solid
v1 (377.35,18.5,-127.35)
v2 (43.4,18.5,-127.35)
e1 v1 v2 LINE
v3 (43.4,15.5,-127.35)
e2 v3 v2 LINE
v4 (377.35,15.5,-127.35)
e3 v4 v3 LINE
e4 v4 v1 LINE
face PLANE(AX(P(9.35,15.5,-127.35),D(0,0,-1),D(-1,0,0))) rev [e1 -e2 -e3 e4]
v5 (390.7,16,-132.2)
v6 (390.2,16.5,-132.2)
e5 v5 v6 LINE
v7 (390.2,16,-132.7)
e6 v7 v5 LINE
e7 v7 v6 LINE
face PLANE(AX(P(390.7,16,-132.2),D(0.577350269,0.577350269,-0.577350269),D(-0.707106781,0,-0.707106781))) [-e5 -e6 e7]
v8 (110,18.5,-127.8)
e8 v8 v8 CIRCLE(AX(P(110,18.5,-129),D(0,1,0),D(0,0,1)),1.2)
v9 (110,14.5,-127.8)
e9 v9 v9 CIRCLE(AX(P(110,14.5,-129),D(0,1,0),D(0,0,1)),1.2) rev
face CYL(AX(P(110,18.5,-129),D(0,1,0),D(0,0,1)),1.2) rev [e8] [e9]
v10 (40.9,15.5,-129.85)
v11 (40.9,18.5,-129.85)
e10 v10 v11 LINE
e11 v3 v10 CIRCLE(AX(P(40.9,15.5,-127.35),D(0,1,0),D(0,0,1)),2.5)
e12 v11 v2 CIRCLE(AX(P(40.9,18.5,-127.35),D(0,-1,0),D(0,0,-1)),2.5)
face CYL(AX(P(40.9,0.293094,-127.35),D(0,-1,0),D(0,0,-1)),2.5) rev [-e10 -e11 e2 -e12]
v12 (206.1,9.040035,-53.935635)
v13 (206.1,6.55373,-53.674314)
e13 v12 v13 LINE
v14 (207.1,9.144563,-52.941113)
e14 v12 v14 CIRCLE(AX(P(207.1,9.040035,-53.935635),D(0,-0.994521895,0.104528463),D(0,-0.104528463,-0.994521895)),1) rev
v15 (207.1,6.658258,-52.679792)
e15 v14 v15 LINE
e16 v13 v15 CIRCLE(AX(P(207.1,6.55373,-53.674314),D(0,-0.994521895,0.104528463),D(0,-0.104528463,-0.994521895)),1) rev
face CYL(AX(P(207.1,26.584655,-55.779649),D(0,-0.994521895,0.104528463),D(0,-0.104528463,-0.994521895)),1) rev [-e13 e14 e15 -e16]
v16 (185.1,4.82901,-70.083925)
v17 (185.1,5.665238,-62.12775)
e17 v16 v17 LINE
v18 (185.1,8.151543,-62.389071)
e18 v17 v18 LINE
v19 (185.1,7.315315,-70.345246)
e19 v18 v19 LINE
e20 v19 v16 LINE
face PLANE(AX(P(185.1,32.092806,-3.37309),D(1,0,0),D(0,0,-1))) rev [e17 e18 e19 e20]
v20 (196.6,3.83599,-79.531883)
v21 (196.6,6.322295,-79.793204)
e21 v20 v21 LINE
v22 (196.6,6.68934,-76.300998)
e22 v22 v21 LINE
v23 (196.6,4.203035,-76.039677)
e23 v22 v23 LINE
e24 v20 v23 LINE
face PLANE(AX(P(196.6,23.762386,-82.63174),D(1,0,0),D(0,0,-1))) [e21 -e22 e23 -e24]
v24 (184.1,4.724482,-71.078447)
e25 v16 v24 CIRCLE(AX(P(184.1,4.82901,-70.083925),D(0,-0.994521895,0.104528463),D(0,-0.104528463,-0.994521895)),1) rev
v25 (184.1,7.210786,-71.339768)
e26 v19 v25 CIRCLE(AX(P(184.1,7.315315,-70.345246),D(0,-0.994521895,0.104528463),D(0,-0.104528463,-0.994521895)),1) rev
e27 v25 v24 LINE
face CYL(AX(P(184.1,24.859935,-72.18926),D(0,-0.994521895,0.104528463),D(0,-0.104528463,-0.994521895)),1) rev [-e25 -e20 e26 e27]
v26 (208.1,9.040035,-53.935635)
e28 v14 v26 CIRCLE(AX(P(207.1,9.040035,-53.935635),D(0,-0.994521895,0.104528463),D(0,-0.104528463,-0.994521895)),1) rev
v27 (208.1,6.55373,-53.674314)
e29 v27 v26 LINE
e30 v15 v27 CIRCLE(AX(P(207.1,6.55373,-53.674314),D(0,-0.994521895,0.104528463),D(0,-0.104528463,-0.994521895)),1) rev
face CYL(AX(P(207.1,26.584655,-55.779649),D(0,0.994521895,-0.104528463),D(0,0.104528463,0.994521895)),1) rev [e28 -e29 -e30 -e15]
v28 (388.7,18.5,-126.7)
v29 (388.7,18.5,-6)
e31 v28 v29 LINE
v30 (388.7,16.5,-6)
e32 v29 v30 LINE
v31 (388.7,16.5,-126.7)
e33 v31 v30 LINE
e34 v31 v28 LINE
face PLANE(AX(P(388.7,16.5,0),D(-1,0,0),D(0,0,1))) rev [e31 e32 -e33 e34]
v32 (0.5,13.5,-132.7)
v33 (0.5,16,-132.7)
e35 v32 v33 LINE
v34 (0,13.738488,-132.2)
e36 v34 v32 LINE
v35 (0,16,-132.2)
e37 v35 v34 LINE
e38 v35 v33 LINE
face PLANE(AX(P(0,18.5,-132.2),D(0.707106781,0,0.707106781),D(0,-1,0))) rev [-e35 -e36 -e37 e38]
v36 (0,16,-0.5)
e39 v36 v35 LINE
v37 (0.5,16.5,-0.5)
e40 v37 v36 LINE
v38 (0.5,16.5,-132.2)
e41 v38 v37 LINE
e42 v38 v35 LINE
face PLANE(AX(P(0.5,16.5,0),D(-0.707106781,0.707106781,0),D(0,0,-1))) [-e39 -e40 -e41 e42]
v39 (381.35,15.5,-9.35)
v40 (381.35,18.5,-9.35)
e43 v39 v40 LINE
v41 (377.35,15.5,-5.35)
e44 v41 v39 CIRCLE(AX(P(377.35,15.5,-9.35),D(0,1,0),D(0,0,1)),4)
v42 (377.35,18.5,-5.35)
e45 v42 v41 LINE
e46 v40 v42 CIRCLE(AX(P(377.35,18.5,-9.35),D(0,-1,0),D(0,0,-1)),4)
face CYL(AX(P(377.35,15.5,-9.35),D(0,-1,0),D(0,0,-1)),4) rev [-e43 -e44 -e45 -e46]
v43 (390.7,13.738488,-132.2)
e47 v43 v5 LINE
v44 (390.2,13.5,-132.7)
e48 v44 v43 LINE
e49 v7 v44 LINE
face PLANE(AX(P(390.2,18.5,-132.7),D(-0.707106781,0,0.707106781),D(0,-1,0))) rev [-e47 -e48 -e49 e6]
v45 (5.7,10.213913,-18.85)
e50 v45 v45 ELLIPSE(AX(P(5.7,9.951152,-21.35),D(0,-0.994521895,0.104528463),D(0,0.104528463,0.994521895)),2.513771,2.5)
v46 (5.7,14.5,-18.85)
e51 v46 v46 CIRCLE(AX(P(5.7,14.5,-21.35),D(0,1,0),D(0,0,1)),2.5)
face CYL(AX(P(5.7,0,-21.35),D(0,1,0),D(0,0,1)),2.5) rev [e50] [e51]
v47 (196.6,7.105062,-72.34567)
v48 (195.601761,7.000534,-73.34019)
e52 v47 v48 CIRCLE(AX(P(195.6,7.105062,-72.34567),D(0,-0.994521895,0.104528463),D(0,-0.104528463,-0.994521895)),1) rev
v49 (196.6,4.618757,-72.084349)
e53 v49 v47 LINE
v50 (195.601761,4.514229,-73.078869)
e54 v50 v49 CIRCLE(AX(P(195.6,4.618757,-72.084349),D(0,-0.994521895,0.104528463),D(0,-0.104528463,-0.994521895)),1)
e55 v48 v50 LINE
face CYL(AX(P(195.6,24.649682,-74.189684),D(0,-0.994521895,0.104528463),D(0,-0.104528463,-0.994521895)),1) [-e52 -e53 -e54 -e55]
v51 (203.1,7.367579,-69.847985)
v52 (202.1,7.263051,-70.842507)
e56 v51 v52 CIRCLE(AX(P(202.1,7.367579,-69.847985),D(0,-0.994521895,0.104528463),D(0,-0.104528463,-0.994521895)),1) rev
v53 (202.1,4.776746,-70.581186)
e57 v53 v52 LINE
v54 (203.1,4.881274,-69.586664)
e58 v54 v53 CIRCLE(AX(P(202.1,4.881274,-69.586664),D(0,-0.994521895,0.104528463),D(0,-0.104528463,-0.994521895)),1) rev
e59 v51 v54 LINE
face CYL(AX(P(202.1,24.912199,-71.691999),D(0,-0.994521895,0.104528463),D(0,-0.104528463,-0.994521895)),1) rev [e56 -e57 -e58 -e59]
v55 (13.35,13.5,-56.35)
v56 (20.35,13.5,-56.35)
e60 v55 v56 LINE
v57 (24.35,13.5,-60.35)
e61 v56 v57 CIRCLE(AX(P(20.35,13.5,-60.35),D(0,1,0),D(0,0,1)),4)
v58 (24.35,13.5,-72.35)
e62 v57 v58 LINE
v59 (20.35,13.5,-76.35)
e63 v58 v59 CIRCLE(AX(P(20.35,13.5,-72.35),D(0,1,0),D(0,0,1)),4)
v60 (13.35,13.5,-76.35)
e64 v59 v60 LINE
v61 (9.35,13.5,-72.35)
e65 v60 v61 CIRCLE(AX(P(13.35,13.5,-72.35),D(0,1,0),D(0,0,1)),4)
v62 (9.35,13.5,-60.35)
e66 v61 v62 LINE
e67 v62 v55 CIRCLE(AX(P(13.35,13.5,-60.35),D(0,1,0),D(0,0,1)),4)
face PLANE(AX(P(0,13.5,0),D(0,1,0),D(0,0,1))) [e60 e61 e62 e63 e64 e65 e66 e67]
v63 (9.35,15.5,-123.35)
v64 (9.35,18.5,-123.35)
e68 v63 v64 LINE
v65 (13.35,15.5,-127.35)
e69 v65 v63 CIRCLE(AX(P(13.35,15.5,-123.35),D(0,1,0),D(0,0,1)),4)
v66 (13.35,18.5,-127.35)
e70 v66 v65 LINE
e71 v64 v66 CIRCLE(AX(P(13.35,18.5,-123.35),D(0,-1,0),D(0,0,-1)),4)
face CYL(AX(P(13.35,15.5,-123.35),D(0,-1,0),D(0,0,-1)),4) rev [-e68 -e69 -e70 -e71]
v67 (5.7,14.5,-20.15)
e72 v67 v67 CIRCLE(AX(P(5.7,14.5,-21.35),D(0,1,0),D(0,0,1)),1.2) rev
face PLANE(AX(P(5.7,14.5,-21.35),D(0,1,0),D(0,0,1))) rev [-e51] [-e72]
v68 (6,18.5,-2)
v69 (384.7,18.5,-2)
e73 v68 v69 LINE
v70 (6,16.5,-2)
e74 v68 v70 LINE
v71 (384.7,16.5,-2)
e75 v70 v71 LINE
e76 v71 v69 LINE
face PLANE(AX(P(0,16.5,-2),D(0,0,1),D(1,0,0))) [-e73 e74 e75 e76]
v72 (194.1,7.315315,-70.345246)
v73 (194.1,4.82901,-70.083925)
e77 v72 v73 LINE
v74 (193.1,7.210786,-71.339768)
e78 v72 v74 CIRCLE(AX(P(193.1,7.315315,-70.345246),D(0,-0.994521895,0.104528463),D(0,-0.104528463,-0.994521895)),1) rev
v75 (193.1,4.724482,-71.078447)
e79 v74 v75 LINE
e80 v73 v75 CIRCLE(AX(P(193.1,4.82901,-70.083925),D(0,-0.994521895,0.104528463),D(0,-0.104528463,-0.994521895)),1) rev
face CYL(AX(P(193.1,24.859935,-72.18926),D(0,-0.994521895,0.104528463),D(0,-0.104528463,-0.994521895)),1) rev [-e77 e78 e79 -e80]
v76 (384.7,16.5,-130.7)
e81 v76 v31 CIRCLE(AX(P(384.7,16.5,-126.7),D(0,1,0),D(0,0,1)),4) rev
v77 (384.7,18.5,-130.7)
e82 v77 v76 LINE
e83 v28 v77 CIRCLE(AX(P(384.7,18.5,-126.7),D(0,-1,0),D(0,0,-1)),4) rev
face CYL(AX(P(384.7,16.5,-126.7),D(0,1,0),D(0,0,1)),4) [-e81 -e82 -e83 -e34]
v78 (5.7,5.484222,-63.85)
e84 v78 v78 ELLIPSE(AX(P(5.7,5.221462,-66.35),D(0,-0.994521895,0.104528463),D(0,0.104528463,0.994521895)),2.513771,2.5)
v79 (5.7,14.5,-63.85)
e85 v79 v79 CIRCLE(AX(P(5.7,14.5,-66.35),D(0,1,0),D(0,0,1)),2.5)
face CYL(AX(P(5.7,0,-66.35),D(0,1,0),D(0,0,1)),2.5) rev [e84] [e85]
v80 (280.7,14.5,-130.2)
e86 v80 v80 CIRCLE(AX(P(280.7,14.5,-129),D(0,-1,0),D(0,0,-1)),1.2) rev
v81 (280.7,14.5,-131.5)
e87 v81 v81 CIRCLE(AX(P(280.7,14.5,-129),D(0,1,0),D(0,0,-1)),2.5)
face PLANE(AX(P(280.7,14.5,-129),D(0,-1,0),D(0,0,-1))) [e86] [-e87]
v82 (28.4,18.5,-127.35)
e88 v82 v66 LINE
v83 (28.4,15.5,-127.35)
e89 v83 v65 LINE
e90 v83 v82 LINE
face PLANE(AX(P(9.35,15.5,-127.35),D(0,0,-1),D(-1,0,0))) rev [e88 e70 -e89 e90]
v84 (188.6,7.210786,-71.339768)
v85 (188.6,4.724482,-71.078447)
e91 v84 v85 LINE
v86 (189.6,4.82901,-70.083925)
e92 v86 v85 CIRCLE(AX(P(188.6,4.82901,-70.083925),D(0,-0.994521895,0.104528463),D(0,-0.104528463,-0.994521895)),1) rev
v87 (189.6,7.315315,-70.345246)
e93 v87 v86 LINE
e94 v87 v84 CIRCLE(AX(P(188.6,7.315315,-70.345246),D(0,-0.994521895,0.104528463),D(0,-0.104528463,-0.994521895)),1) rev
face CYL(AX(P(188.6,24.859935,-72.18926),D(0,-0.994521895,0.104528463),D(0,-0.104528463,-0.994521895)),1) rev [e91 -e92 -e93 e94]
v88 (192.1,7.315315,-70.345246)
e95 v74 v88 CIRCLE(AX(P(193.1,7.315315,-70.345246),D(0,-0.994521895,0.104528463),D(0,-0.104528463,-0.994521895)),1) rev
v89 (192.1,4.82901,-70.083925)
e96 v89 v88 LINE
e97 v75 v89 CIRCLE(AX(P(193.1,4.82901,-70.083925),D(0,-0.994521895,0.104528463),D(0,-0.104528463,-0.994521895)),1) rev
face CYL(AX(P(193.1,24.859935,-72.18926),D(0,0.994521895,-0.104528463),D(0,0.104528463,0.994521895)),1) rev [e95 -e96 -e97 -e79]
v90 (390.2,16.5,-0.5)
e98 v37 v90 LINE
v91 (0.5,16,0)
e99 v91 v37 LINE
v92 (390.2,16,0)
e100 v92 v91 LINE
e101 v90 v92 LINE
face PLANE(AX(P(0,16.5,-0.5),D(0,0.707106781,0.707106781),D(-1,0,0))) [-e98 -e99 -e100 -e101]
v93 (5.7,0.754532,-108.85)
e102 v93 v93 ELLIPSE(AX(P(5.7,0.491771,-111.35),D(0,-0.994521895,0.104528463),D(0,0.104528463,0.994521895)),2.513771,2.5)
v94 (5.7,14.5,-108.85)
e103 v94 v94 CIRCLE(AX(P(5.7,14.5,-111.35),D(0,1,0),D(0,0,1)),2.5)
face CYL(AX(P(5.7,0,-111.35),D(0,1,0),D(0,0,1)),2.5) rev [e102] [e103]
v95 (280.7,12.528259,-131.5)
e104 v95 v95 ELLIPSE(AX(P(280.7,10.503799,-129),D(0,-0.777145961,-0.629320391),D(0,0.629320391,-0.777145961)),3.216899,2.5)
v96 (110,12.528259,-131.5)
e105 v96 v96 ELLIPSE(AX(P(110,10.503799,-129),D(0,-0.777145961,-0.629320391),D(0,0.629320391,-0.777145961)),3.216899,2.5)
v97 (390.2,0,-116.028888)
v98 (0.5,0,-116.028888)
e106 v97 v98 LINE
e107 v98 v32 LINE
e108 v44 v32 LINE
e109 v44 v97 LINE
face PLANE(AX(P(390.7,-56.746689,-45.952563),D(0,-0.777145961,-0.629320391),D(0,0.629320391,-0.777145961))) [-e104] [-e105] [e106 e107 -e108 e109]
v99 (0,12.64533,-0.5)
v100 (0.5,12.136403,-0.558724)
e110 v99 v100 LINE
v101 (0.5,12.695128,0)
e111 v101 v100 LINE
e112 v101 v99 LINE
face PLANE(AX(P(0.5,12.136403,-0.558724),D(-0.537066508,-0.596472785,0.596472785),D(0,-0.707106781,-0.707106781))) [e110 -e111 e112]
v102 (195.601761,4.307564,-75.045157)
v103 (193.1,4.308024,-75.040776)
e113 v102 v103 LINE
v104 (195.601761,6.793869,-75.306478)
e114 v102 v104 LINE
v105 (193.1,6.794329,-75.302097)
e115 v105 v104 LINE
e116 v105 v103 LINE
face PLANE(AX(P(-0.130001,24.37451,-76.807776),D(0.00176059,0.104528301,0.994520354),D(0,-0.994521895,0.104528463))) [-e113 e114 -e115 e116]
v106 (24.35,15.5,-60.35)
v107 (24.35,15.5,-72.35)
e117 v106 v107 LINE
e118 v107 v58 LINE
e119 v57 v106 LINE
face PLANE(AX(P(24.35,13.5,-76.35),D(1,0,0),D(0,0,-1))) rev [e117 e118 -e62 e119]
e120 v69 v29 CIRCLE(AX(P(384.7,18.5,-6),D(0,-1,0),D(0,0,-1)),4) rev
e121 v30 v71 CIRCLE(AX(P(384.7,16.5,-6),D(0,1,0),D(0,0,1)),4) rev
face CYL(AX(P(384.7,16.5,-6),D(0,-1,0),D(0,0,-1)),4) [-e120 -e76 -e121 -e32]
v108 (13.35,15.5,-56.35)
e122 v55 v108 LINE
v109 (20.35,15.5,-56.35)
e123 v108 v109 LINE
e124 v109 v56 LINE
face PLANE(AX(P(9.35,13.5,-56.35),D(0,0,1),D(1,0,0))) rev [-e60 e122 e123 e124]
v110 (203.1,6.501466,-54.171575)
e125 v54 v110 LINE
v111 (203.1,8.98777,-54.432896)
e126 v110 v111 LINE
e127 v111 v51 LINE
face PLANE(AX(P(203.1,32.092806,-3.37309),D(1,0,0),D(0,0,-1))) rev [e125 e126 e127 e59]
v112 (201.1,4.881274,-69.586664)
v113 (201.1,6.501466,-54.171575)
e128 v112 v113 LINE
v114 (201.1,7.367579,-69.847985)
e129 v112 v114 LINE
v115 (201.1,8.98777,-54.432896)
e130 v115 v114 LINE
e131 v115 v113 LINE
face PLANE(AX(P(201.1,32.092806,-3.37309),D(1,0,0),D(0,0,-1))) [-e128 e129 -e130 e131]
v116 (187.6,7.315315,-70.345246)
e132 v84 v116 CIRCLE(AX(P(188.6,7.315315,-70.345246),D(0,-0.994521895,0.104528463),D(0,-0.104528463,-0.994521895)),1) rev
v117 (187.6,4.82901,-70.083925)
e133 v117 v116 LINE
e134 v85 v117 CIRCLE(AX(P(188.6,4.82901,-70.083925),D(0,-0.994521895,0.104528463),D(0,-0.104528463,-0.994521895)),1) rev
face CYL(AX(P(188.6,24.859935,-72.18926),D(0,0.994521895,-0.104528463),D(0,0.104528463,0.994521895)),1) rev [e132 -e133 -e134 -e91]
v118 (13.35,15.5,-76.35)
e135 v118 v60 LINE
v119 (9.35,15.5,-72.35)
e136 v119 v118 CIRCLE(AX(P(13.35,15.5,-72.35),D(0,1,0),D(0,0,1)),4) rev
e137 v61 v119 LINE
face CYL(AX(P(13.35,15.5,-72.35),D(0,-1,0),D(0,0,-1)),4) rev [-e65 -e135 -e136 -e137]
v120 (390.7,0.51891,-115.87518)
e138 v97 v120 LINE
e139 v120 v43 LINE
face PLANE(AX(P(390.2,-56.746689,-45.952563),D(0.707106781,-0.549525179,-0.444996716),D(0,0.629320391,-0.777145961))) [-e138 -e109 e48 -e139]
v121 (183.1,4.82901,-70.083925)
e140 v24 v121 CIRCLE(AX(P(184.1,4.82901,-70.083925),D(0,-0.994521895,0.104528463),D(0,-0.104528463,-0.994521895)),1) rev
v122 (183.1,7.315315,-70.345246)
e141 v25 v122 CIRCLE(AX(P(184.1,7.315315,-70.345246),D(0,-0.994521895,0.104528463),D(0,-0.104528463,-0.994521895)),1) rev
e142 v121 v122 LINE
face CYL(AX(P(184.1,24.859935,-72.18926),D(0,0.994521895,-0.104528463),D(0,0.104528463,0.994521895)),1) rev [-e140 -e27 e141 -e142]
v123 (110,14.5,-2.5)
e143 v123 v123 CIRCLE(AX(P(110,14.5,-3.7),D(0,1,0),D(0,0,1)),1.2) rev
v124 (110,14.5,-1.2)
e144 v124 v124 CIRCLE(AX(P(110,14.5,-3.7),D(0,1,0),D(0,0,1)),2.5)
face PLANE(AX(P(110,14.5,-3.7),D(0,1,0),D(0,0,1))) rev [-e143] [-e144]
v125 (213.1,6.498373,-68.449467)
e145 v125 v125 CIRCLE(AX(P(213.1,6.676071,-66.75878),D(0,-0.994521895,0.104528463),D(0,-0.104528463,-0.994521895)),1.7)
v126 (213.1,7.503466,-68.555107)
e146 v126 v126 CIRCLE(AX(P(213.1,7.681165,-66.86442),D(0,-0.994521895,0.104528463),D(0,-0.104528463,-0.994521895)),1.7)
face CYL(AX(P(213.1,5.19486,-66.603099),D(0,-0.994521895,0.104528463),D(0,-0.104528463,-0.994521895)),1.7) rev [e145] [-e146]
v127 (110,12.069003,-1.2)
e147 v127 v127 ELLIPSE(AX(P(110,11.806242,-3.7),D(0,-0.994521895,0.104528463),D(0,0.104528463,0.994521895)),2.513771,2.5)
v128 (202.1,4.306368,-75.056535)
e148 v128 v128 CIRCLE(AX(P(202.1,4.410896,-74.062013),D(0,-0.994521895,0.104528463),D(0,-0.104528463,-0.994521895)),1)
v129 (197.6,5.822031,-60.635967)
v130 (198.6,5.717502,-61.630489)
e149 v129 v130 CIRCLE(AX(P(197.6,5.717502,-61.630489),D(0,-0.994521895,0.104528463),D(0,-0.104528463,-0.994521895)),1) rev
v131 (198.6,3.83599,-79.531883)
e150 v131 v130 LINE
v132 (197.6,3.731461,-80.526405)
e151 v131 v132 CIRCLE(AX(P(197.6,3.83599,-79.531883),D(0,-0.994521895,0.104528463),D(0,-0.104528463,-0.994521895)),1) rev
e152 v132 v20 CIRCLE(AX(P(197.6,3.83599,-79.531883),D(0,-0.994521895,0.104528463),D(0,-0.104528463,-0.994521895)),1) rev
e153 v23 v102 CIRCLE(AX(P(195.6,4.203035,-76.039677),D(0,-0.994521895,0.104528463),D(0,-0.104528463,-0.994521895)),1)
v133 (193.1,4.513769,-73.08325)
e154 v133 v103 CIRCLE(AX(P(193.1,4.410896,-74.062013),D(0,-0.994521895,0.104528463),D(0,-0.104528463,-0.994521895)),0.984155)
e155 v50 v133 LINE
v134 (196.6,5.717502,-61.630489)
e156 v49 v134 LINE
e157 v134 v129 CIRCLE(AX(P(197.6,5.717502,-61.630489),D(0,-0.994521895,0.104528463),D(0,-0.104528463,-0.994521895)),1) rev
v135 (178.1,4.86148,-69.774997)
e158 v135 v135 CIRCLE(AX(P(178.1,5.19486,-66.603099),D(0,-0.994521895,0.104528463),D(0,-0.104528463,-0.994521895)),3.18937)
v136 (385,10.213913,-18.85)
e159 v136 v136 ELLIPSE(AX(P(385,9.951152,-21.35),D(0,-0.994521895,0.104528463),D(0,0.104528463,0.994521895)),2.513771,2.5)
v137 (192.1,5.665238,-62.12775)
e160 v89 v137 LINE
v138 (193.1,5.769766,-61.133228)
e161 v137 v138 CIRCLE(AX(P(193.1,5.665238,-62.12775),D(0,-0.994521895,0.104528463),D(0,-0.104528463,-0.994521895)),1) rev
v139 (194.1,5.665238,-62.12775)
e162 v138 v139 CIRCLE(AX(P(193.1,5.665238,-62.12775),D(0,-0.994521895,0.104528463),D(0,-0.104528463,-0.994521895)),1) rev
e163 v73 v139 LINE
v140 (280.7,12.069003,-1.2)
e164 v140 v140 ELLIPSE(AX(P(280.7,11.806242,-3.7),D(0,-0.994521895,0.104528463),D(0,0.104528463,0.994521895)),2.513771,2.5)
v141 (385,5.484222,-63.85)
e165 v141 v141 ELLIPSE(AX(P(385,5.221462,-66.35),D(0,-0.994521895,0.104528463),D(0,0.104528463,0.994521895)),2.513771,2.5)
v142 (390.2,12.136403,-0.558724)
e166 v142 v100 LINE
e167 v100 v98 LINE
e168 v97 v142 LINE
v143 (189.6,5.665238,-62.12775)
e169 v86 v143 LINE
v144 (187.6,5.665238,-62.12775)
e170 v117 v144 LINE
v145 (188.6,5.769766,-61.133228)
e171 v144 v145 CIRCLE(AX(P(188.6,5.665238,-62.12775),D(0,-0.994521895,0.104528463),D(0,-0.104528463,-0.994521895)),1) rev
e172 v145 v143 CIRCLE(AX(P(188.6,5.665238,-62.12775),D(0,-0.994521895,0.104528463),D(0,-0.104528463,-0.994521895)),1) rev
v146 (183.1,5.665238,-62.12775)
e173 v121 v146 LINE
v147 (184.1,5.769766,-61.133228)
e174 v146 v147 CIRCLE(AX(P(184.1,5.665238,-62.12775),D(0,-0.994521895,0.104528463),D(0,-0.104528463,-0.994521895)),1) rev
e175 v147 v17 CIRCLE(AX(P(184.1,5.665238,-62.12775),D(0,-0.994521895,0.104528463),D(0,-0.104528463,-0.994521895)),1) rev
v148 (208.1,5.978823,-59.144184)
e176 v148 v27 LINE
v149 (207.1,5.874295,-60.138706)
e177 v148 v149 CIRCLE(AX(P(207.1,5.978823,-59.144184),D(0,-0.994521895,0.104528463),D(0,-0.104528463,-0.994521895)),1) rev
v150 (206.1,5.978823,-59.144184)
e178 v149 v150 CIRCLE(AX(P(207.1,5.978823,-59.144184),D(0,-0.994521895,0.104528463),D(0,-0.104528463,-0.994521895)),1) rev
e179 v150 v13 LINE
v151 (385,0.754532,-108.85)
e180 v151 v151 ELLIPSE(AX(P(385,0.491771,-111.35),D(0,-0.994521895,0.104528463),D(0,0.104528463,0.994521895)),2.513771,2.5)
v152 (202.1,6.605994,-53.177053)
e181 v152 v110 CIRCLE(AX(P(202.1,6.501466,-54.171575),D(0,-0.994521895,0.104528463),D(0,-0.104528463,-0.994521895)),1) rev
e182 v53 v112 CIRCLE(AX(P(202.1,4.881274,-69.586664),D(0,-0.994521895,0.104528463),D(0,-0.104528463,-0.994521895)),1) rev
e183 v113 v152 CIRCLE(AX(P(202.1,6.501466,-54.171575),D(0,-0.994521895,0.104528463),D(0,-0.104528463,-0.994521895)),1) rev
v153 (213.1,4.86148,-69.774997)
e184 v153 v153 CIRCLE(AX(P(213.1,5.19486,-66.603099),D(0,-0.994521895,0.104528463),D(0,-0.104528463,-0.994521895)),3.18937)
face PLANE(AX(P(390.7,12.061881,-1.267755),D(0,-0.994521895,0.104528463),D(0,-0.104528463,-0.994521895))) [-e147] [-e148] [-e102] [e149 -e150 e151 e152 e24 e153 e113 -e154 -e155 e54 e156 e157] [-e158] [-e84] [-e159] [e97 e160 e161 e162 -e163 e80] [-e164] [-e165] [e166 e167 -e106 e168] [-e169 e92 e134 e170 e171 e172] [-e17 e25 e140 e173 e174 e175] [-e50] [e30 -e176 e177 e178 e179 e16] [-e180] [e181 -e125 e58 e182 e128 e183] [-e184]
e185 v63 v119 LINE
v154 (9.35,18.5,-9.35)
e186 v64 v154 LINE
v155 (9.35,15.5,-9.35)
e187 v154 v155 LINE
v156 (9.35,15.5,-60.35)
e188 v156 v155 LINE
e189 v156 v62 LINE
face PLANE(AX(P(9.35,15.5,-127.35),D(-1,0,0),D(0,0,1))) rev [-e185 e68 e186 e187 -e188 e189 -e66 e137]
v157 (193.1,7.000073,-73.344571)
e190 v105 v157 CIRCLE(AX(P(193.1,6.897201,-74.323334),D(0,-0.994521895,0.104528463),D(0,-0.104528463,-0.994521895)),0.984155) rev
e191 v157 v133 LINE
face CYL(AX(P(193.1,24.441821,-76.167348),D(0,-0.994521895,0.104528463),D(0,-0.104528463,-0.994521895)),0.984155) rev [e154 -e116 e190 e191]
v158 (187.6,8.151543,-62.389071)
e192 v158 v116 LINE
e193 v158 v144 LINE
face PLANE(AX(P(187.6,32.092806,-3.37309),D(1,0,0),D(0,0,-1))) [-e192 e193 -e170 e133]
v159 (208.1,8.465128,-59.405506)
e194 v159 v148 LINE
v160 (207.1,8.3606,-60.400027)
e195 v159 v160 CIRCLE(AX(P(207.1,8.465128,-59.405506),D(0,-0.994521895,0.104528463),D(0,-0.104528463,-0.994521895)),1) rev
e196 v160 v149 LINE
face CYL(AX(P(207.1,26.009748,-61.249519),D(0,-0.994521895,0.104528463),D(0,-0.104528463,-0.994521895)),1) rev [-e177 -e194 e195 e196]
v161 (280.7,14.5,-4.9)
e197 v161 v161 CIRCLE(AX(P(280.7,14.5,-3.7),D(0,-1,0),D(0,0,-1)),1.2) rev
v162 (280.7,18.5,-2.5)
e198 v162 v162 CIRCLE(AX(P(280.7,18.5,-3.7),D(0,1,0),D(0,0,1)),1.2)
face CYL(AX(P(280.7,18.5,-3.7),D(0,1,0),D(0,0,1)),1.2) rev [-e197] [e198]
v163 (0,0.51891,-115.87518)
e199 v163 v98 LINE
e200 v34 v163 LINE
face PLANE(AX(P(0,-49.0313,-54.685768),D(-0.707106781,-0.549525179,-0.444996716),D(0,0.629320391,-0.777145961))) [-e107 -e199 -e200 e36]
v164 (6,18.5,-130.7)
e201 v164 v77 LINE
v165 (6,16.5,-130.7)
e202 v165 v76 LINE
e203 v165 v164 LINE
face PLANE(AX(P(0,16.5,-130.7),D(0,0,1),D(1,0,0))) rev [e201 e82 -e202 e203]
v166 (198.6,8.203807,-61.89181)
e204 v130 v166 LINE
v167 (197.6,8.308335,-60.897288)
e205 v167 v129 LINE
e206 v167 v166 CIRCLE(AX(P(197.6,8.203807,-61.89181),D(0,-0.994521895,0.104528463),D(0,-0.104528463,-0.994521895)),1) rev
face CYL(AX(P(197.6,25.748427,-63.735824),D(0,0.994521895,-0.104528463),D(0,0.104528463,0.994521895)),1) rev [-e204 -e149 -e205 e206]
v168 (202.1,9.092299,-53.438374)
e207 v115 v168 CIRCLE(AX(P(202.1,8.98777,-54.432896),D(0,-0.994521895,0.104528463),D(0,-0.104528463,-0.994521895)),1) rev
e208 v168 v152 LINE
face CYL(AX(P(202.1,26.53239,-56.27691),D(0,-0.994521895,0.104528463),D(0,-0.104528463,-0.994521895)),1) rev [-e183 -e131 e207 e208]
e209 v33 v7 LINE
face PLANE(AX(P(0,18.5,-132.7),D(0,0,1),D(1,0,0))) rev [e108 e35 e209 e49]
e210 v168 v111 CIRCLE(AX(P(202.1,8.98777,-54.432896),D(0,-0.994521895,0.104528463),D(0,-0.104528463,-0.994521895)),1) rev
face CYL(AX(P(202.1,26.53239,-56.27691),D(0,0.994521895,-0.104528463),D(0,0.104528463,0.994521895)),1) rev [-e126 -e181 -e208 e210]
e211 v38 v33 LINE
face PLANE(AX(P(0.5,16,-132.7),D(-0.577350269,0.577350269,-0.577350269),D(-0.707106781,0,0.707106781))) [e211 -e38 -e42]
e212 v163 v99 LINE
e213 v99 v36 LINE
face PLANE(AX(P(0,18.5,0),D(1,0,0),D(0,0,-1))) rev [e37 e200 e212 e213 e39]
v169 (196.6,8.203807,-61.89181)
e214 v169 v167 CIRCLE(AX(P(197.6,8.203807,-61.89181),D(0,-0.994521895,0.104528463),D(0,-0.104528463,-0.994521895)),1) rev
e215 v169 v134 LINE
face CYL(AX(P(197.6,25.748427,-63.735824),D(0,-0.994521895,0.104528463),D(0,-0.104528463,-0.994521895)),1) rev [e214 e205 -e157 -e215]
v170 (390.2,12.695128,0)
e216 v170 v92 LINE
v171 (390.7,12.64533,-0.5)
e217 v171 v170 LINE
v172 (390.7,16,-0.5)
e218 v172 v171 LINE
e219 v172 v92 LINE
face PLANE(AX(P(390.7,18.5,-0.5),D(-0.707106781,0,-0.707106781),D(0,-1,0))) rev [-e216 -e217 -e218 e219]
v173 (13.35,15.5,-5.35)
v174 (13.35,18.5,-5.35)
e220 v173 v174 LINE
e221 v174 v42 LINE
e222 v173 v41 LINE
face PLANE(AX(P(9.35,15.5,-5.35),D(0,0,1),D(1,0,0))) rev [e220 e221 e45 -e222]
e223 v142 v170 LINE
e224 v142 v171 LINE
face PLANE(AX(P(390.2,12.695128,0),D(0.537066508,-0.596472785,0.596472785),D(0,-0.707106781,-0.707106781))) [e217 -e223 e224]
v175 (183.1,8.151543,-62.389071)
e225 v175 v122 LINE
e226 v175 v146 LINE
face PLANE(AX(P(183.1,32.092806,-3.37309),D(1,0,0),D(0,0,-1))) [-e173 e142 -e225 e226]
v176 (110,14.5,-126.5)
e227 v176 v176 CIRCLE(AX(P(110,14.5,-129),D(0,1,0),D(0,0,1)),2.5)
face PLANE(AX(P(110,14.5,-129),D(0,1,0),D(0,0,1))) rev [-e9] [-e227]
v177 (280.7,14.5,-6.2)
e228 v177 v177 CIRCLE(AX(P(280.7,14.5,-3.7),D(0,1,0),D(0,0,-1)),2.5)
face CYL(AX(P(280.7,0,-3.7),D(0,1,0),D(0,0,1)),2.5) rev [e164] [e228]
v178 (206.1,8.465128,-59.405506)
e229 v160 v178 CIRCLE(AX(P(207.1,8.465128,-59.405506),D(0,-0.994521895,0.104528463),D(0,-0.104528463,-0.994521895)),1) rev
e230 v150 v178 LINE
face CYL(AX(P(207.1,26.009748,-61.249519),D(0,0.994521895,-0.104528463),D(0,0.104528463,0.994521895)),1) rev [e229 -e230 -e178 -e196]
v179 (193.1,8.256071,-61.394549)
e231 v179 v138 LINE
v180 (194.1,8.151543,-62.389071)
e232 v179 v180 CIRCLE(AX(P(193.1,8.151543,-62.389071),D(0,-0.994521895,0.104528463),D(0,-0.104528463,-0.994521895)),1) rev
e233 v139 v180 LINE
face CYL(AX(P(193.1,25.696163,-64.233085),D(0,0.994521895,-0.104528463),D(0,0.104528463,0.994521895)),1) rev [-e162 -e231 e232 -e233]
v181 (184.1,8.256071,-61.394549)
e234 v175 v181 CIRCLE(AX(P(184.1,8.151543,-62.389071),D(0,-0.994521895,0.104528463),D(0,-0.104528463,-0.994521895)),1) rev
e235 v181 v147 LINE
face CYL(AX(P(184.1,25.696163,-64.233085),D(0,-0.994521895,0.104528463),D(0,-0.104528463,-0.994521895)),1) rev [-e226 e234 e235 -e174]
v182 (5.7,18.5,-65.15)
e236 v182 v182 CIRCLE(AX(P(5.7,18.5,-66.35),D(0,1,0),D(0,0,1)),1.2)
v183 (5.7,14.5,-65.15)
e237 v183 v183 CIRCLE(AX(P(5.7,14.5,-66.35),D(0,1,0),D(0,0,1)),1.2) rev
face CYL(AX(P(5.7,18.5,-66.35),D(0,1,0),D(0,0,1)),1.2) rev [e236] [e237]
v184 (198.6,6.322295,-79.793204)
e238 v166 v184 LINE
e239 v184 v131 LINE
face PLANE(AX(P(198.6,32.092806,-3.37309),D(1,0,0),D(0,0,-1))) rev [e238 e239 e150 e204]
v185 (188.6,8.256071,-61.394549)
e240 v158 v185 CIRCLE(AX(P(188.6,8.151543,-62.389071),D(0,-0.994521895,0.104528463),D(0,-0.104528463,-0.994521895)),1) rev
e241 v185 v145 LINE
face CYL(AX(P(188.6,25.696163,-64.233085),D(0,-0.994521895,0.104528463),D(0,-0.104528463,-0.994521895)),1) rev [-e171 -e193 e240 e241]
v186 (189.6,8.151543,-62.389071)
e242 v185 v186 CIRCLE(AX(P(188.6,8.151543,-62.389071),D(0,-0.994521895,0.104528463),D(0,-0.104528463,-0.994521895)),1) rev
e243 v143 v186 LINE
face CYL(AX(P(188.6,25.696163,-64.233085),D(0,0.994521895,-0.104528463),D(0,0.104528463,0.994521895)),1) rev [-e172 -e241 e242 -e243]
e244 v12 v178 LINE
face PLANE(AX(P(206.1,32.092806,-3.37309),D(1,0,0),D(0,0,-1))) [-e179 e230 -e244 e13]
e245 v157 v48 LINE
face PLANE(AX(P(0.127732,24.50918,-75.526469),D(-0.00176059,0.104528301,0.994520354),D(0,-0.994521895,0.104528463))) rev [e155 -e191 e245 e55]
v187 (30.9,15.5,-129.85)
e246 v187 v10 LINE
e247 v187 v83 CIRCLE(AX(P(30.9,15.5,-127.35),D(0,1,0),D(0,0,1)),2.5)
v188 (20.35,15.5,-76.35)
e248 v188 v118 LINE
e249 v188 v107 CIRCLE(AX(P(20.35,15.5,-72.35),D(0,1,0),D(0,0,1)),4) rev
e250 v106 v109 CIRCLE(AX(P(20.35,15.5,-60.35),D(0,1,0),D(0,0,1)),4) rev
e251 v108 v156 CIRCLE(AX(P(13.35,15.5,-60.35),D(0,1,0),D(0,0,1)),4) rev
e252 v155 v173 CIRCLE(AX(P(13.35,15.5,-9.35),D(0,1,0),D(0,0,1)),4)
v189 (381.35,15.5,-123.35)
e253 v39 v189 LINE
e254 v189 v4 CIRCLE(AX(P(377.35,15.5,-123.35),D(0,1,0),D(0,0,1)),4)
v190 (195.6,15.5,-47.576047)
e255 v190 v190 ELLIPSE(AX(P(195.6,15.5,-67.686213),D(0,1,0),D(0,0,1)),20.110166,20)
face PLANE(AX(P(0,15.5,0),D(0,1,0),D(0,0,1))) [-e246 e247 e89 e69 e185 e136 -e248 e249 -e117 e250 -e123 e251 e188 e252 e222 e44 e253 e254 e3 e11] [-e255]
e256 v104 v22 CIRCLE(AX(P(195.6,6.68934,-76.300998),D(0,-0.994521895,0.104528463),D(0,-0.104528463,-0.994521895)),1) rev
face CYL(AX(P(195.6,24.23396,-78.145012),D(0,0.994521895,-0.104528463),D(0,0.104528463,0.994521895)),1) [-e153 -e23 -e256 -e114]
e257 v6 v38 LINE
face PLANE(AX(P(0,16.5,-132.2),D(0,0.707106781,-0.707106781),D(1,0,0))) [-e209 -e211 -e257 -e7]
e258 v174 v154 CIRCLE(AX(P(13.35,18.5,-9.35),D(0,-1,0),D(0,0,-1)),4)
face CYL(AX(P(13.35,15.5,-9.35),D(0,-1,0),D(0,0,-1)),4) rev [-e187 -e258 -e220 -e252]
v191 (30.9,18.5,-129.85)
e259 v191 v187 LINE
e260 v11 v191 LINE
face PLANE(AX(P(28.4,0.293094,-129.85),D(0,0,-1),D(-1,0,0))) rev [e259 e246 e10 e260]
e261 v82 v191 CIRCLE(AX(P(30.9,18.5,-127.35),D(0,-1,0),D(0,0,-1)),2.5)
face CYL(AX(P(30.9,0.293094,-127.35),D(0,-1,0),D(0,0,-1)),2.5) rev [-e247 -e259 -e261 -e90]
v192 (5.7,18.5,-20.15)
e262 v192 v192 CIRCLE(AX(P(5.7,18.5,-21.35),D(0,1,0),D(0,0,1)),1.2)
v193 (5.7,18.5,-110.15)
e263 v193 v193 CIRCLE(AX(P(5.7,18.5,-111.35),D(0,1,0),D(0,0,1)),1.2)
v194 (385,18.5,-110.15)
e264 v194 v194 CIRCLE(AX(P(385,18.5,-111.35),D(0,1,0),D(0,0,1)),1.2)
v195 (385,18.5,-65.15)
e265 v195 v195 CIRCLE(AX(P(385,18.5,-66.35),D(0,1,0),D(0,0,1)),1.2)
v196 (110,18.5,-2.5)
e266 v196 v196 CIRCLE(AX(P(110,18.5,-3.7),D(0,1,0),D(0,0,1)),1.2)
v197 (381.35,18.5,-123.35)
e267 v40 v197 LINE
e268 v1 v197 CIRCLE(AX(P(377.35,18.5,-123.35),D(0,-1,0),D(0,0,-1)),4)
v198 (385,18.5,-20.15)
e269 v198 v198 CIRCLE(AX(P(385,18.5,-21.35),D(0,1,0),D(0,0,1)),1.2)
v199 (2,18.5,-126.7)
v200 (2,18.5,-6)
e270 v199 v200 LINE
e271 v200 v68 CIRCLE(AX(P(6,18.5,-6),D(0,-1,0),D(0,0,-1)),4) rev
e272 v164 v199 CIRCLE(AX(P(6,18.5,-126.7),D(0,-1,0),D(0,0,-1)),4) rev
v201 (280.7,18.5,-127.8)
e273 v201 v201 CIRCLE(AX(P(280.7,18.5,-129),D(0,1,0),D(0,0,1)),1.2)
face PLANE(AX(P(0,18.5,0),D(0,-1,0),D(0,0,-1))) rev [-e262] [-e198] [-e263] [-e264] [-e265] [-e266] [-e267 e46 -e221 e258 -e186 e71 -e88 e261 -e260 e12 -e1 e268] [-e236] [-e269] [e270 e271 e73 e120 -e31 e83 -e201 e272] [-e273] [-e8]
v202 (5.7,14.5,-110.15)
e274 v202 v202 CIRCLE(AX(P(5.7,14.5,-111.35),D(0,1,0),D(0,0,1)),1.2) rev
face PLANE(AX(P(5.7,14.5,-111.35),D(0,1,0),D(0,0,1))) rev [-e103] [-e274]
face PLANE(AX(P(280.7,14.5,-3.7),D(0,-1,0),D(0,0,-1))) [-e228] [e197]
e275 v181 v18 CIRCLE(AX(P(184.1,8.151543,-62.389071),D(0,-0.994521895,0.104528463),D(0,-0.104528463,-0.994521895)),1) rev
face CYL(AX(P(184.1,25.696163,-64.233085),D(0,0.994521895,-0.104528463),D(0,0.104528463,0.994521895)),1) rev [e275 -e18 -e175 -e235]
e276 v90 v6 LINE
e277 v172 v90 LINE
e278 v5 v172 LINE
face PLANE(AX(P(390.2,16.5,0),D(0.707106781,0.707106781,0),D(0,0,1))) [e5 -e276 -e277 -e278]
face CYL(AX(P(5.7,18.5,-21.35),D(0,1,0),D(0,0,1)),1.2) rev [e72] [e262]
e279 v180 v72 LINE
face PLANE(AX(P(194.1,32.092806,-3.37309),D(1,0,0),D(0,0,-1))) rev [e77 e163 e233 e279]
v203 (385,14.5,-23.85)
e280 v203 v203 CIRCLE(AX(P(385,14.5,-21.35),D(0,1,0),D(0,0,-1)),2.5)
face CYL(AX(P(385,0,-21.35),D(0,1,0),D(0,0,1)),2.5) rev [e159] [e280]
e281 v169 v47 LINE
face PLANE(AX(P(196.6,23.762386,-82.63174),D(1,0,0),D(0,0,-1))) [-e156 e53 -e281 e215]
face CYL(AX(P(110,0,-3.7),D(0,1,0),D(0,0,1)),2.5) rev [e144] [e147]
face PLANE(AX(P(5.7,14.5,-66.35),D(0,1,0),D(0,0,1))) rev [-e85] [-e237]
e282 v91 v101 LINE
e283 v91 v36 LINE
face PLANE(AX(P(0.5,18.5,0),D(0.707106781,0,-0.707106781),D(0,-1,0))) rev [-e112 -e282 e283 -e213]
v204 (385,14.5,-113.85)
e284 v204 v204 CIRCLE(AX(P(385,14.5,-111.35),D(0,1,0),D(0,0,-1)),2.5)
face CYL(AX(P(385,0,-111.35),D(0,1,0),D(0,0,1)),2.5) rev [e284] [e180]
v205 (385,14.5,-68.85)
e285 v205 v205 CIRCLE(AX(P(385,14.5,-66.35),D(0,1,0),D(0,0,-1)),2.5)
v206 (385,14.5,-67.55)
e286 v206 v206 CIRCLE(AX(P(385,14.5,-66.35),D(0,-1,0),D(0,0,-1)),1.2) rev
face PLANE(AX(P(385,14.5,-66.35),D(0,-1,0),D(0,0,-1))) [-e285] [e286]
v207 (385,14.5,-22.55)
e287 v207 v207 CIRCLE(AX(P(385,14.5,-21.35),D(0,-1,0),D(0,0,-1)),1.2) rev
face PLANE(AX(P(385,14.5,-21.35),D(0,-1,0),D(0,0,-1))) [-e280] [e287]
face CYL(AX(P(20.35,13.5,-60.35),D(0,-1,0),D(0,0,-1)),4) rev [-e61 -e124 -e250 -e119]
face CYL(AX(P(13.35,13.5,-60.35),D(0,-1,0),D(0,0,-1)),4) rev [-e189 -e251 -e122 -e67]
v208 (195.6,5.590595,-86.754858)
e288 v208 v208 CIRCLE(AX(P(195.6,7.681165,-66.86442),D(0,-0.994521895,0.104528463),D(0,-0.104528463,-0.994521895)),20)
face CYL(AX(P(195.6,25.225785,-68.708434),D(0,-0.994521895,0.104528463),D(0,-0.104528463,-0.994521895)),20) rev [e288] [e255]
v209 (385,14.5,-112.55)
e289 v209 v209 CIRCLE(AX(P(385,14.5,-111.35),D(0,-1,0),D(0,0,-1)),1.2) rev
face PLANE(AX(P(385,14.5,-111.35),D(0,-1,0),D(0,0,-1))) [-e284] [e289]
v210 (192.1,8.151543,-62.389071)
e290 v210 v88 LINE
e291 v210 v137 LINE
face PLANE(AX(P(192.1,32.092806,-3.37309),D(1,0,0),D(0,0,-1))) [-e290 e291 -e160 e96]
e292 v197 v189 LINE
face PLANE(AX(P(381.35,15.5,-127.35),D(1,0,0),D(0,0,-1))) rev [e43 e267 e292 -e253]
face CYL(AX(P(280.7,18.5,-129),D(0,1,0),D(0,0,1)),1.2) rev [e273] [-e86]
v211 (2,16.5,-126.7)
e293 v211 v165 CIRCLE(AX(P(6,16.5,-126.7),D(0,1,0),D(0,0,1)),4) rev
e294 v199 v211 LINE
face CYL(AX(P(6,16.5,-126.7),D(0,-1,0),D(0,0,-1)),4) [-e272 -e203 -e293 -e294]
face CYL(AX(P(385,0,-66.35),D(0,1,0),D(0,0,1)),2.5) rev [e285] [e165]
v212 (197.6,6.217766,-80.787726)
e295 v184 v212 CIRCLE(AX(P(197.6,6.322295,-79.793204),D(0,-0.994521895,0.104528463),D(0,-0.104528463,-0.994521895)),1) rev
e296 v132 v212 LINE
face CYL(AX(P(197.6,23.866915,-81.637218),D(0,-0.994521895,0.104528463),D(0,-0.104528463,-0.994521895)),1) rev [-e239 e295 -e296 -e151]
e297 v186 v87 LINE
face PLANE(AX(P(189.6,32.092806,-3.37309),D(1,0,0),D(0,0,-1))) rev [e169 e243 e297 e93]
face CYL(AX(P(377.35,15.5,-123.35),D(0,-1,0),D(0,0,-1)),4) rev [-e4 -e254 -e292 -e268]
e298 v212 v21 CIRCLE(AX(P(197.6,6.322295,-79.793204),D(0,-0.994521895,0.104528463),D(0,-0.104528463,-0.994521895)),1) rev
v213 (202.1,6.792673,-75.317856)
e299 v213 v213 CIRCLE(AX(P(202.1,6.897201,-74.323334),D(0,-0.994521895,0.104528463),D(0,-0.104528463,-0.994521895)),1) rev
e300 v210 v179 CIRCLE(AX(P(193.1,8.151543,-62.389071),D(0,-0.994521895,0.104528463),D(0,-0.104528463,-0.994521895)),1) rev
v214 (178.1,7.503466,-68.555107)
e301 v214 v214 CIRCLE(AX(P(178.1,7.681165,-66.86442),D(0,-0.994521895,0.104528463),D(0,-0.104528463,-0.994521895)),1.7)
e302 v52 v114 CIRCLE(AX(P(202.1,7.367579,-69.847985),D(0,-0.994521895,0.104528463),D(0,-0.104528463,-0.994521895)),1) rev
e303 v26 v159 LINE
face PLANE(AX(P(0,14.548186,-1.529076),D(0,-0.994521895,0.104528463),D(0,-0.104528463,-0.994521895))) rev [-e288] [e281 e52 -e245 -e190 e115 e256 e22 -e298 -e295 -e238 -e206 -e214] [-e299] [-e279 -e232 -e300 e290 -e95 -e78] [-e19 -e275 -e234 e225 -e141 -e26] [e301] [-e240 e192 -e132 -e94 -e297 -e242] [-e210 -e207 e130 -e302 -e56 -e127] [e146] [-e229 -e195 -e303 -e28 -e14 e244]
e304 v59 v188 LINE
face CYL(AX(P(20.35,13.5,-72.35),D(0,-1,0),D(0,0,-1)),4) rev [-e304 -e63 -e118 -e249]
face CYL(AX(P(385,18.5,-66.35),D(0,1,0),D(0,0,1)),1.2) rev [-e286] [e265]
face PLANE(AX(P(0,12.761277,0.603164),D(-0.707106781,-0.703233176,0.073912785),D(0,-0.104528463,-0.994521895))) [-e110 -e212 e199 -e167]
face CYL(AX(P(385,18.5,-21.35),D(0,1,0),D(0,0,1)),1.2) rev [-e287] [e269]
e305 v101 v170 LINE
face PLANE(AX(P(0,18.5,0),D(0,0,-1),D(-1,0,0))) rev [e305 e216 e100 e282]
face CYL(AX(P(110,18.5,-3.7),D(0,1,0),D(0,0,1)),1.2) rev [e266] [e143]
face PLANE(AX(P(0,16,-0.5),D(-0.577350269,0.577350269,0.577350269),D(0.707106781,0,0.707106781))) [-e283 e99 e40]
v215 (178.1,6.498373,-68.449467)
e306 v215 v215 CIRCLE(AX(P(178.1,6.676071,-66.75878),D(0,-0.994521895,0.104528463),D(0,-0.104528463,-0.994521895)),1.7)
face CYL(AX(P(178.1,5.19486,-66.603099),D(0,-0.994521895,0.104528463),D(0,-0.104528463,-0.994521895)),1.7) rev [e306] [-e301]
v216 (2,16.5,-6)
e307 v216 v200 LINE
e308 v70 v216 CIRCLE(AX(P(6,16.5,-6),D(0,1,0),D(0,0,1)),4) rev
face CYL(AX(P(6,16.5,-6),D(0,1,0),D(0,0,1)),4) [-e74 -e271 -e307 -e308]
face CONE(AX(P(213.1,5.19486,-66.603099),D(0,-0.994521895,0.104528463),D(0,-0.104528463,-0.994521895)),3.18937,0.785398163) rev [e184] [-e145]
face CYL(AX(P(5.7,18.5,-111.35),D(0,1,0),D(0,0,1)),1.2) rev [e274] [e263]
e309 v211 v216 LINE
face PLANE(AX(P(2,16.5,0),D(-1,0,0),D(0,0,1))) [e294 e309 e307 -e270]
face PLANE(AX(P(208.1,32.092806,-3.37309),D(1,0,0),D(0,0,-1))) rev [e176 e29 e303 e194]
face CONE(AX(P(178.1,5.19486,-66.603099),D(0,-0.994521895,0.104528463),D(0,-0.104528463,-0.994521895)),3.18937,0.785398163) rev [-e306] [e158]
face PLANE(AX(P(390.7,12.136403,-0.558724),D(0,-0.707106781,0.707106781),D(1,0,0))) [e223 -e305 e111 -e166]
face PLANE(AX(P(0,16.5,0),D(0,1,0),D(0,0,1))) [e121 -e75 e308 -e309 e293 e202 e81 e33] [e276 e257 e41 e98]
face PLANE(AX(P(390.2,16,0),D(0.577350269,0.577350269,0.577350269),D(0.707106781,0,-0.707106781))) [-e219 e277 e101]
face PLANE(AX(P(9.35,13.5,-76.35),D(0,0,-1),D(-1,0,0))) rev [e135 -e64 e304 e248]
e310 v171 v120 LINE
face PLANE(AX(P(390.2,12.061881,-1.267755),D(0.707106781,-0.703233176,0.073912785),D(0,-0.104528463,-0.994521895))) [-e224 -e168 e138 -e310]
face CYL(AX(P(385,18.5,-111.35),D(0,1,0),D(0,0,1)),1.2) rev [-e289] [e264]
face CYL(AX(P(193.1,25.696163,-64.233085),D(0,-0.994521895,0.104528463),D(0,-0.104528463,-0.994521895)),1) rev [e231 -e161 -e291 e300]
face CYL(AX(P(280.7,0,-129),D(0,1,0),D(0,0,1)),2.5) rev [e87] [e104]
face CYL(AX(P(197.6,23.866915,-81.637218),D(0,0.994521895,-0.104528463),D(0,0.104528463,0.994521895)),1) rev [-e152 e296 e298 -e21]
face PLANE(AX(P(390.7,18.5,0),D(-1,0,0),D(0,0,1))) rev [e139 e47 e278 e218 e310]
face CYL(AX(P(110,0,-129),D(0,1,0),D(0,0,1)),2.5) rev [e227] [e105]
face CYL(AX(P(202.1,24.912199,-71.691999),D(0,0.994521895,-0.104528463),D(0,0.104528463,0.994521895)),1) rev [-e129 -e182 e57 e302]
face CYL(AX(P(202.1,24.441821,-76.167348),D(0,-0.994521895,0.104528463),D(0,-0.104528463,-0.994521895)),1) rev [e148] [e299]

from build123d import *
from OCP.BRepFilletAPI import BRepFilletAPI_MakeChamfer

# Parameters (mm, degrees)
SKETCH1_W                                            = 390.7
SKETCH1_H                                            = 132.7
MAINBODY_DEPTH                                       = 18.5
SKETCH2_W                                            = 390.7
SKETCH2_H                                            = 132.7
SKETCH2_W_2                                          = 386.7
SKETCH2_H_2                                          = 128.7
ALIGMENTLIP_DEPTH                                    = 2
TYPINGANGLE_DEPTH                                    = 414.035143783
SKETCH4_W                                            = 372
SKETCH4_H                                            = 122
PCBCUTOUT_DEPTH                                      = 3
M2_CLEARANCE_HOLE2_D                                 = 2.4
CUT_EXTRUDE2_START                                   = -1
SKETCH11_R                                           = 2.5
CUT_EXTRUDE2_DEPTH                                   = 412.911649145
SKETCH12_W                                           = 15
SKETCH12_H                                           = 2.5
CUT_EXTRUDE3_DEPTH                                   = 3
FILLET1_R                                            = 2.5
SKETCH13_W                                           = 15
SKETCH13_H                                           = 20
CUT_EXTRUDE4_DEPTH                                   = 2
FILLET2_R                                            = 4
CUT_EXTRUDE7_START                                   = -11.833363055
CUT_EXTRUDE7_OUTLINE_W                               = 2
CUT_EXTRUDE7_OUTLINE_H                               = 17.5
CUT_EXTRUDE7_OUTLINE_H_2                             = 7.5
CUT_EXTRUDE7_OUTLINE_H_3                             = 10
CUT_EXTRUDE7_OUTLINE_R                               = 1
CUT_EXTRUDE7_DEPTH                                   = 11.833363055
FILLET3_R                                            = 1
CHAMFER1_SIZE                                        = 0.5
CHAMFER1_SIZE2                                       = 0.561801899
CUT_EXTRUDE10_START                                  = -2.5
SKETCH18_R                                           = 20
SKETCH18_W                                           = 25
SKETCH18_H                                           = 28
CUT_EXTRUDE10_DEPTH                                  = 410.891093571
FILLET4_R                                            = 1
CSK_FOR_M3_FLAT_HEAD_MACHINE_SCREW1_D                = 3.4
CSK_FOR_M3_FLAT_HEAD_MACHINE_SCREW1_CSINK_D          = 6.37874
CSK_FOR_M3_FLAT_HEAD_MACHINE_SCREW1_CSINK_ANGLE      = 90
CSK_FOR_M3_FLAT_HEAD_MACHINE_SCREW1_ON_F_D           = 3.4
CSK_FOR_M3_FLAT_HEAD_MACHINE_SCREW1_ON_F_CSINK_D     = 6.37874
CSK_FOR_M3_FLAT_HEAD_MACHINE_SCREW1_ON_F_CSINK_ANGLE = 90


# Read off the part's stored shape, not the designer's step: Cut-Extrude7
with BuildPart() as part:
    # Sketch1 → MainBody (new body)
    with BuildSketch(Plane(origin=(0, 0, 0), x_dir=(1, 0, 0), z_dir=(0, 1, 0))):
        with Locations((195.35, 66.35)):
            Rectangle(SKETCH1_W, SKETCH1_H)
    extrude(amount=MAINBODY_DEPTH)

    # Sketch2 → AligmentLip (cut)
    with BuildSketch(Plane(origin=(0, 18.5, 0), x_dir=(1, 0, 0), z_dir=(0, 1, 0))):
        with Locations((195.35, 66.35)):
            Rectangle(SKETCH2_W, SKETCH2_H)
        with Locations((195.35, 66.35)):
            Rectangle(SKETCH2_W_2, SKETCH2_H_2, mode=Mode.SUBTRACT)
    extrude(amount=-ALIGMENTLIP_DEPTH, mode=Mode.SUBTRACT)

    # Sketch3 → TypingAngle (cut, through all)
    with BuildSketch(Plane.ZY):
        Polygon((-116.028888387, 0), (-132.7, 13.5), (-132.7, 0), align=None)
        Polygon((0, 12.195127583), (-116.028888387, 0), (0, 0), align=None)
    extrude(amount=-TYPINGANGLE_DEPTH, mode=Mode.SUBTRACT)

    # Sketch4 → PCBCutout (cut)
    with BuildSketch(Plane(origin=(0, 18.5, 0), x_dir=(1, 0, 0), z_dir=(0, 1, 0))):
        with Locations((195.35, 66.35)):
            Rectangle(SKETCH4_W, SKETCH4_H)
    extrude(amount=-PCBCUTOUT_DEPTH, mode=Mode.SUBTRACT)

    # M2 Clearance Hole2 (through all)
    with Locations(Plane(origin=(110, 18.5, -129), x_dir=(0, 0, 1), z_dir=(0, 1, 0))):
        with Locations((0, 0), (17.65, -104.3), (62.65, -104.3), (107.65, -104.3), (125.3, 0), (0, 170.7), (125.3, 170.7), (107.65, 275), (62.65, 275), (17.65, 275)):
            Hole(M2_CLEARANCE_HOLE2_D / 2)

    # Sketch11 → Cut-Extrude2 (cut, through all)
    with BuildSketch(Plane(origin=(0, 15.5, 0), x_dir=(1, 0, 0), z_dir=(0, 1, 0)).offset(CUT_EXTRUDE2_START)):
        with Locations(Location((110, 129, 0), (0, 0, 270))):
            Circle(SKETCH11_R)
        with Locations(Location((5.7, 111.35, 0), (0, 0, 270))):
            Circle(SKETCH11_R)
        with Locations(Location((5.7, 66.35, 0), (0, 0, 270))):
            Circle(SKETCH11_R)
        with Locations(Location((5.7, 21.35, 0), (0, 0, 270))):
            Circle(SKETCH11_R)
        with Locations(Location((110, 3.7, 0), (0, 0, 270))):
            Circle(SKETCH11_R)
        with Locations(Location((280.7, 3.7, 0), (0, 0, 270))):
            Circle(SKETCH11_R)
        with Locations(Location((385, 21.35, 0), (0, 0, 270))):
            Circle(SKETCH11_R)
        with Locations(Location((385, 66.35, 0), (0, 0, 270))):
            Circle(SKETCH11_R)
        with Locations(Location((385, 111.35, 0), (0, 0, 270))):
            Circle(SKETCH11_R)
        with Locations(Location((280.7, 129, 0), (0, 0, 90))):
            Circle(SKETCH11_R)
    extrude(amount=-CUT_EXTRUDE2_DEPTH, mode=Mode.SUBTRACT)

    # Sketch12 → Cut-Extrude3 (cut)
    with BuildSketch(Plane(origin=(0, 18.5, 0), x_dir=(1, 0, 0), z_dir=(0, 1, 0))):
        with Locations((35.9, 128.6)):
            Rectangle(SKETCH12_W, SKETCH12_H)
    extrude(amount=-CUT_EXTRUDE3_DEPTH, mode=Mode.SUBTRACT)

    # Fillet1
    fillet1_edges = [part.edges().sort_by_distance(p)[0] for p in [
        (43.4, 17, -129.85),
        (28.4, 17, -129.85),
    ]]
    fillet(fillet1_edges, radius=FILLET1_R - 0.0001)  # a hair under: the kernel refuses the full size

    # Sketch13 → Cut-Extrude4 (cut)
    with BuildSketch(Plane(origin=(0, 15.5, 0), x_dir=(1, 0, 0), z_dir=(0, 1, 0))):
        with Locations((16.85, 66.35)):
            Rectangle(SKETCH13_W, SKETCH13_H)
    extrude(amount=-CUT_EXTRUDE4_DEPTH, mode=Mode.SUBTRACT)

    # Fillet2
    fillet2_edges = [part.edges().sort_by_distance(p)[0] for p in [
        (388.7, 17.5, -130.7),
        (2, 17.5, -130.7),
        (2, 17.5, -2),
        (388.7, 17.5, -2),
        (9.35, 14.5, -56.35),
        (9.35, 14.5, -76.35),
        (24.35, 14.5, -76.35),
        (24.35, 14.5, -56.35),
        (9.35, 17, -5.35),
        (9.35, 17, -127.35),
        (381.35, 17, -127.35),
        (381.35, 17, -5.35),
    ]]
    fillet(fillet2_edges, radius=FILLET2_R)

    # Cut-Extrude7 outline → Cut-Extrude7 (cut)
    with BuildSketch(Plane(origin=(0, 12.061881184, -1.267754798), x_dir=(1, 0, 0), z_dir=(0, -0.9945218953682734, 0.10452846326765429)).offset(CUT_EXTRUDE7_START)):
        with Locations((202.1, -60.945229197)):
            Rectangle(CUT_EXTRUDE7_OUTLINE_W, CUT_EXTRUDE7_OUTLINE_H)
        with BuildLine():
            Line((196.6, -79.695229197), (198.6, -79.695229197))
            Line((198.6, -79.695229197), (198.6, -59.695229197))
            Line((198.6, -59.695229197), (196.6, -59.695229197))
            Line((196.6, -59.695229197), (196.6, -72.204912456))
            Line((196.6, -72.204912456), (193.1, -72.21107453))
            ThreePointArc((193.1, -72.21107453), (192.115845333, -73.195229197), (193.1, -74.179383864))
            Line((193.1, -74.179383864), (196.6, -74.185545938))
            Line((196.6, -74.185545938), (196.6, -79.695229197))
        make_face()
        with Locations((207.1, -55.445229197)):
            Rectangle(CUT_EXTRUDE7_OUTLINE_W, CUT_EXTRUDE7_OUTLINE_H_2)
        with Locations((184.1, -65.195229197)):
            Rectangle(CUT_EXTRUDE7_OUTLINE_W, CUT_EXTRUDE7_OUTLINE_H_3)
        with Locations((188.6, -65.195229197)):
            Rectangle(CUT_EXTRUDE7_OUTLINE_W, CUT_EXTRUDE7_OUTLINE_H_3)
        with Locations((193.1, -65.195229197)):
            Rectangle(CUT_EXTRUDE7_OUTLINE_W, CUT_EXTRUDE7_OUTLINE_H_3)
        with Locations((202.1, -73.195229197)):
            Circle(CUT_EXTRUDE7_OUTLINE_R)
    extrude(amount=CUT_EXTRUDE7_DEPTH, mode=Mode.SUBTRACT)

    # Fillet3
    fillet3_edges = [part.edges().sort_by_distance(p)[0] for p in [
        (183.1, 10.63488319, -61.644572613),
        (187.6, 10.63488319, -61.644572613),
        (192.1, 10.63488319, -61.644572613),
        (185.1, 10.63488319, -61.644572613),
        (189.6, 10.63488319, -61.644572613),
        (194.1, 10.63488319, -61.644572613),
        (185.1, 10.112240874, -71.644723487),
        (189.6, 10.112240874, -71.644723487),
        (194.1, 10.112240874, -71.644723487),
        (183.1, 10.112240874, -71.644723487),
        (187.6, 10.112240874, -71.644723487),
        (192.1, 10.112240874, -71.644723487),
        (196.6, 9.615730673, -81.144866818),
        (198.6, 9.615730673, -81.144866818),
        (196.6, 10.661015306, -61.144565069),
        (198.6, 10.661015306, -61.144565069),
        (201.1, 11.052997043, -53.644451913),
        (203.1, 11.052997043, -53.644451913),
        (206.1, 11.079129159, -53.144444369),
        (208.1, 11.079129159, -53.144444369),
        (208.1, 10.687147422, -60.644557525),
        (206.1, 10.687147422, -60.644557525),
        (201.1, 10.13837299, -71.144715944),
        (203.1, 10.13837299, -71.144715944),
    ]]
    fillet(fillet3_edges, radius=FILLET3_R - 0.0001)  # a hair under: the kernel refuses the full size

    # Chamfer1: one chamfer whose edges measure the first distance from different faces: ONE call of the kernel's chamfer builder (chamfer() names one face for all edges)
    chamfer1_edges_1 = [part.edges().sort_by_distance(p)[0] for p in [
        (0, 15, -132.7),
        (390.7, 15, -132.7),
        (390.7, 14.347563791, 0),
        (0, 14.347563791, 0),
        (195.35, 16.5, -132.7),
        (390.7, 16.5, -66.35),
        (195.35, 16.5, 0),
        (0, 16.5, -66.35),
        (0, 6.75, -124.364444193),
        (390.7, 6.75, -124.364444193),
        (0, 6.097563791, -58.014444193),
        (390.7, 6.097563791, -58.014444193),
    ]]
    chamfer1_edges_2 = [part.edges().sort_by_distance(p)[0] for p in [
        (195.35, 12.195127583, 0),
    ]]
    chamfer1_side_2 = [part.faces().sort_by_distance(p)[0] for p in [
        (195.35, 14.347563791, 0),
    ]]
    chamfer1 = BRepFilletAPI_MakeChamfer(part.part.solid().wrapped)
    for e in chamfer1_edges_1:
        chamfer1.Add(CHAMFER1_SIZE, e.wrapped)
    for e in chamfer1_edges_2:
        chamfer1.Add(CHAMFER1_SIZE, CHAMFER1_SIZE2, e.wrapped, chamfer1_side_2[0].wrapped)  # the first distance lies on this face
    add(Compound.cast(chamfer1.Shape()), mode=Mode.REPLACE)

    # Sketch18 → Cut-Extrude10 (cut, through all)
    # profile 1 of 3: a face of its own
    with BuildSketch(Plane(origin=(0, 12.061881184, -1.267754798), x_dir=(1, 0, 0), z_dir=(0, -0.9945218953682734, 0.10452846326765429)).offset(CUT_EXTRUDE10_START)):
        with Locations(Location((195.6, -65.695229197, 0), (0, 0, 270))):
            Circle(SKETCH18_R)
        with Locations((195.6, -65.695229197)):
            Rectangle(SKETCH18_W, SKETCH18_H, mode=Mode.SUBTRACT)
    # profile 2 of 3: a face of its own
    with BuildSketch(Plane(origin=(0, 12.061881184, -1.267754798), x_dir=(1, 0, 0), z_dir=(0, -0.9945218953682734, 0.10452846326765429)).offset(CUT_EXTRUDE10_START)):
        Polygon((183.1, -51.695229197), (208.1, -79.695229197), (183.1, -79.695229197), align=None)
    # profile 3 of 3: a face of its own
    with BuildSketch(Plane(origin=(0, 12.061881184, -1.267754798), x_dir=(1, 0, 0), z_dir=(0, -0.9945218953682734, 0.10452846326765429)).offset(CUT_EXTRUDE10_START)):
        Polygon((208.1, -51.695229197), (183.1, -51.695229197), (208.1, -79.695229197), align=None)
    extrude(amount=-CUT_EXTRUDE10_DEPTH, mode=Mode.SUBTRACT)

    # Fillet4
    fillet4_edges = [part.edges().sort_by_distance(p)[0] for p in [
        (196.6, 5.757565014, -73.207781767),
        (196.6, 5.55053244, -75.177565132),
    ]]
    fillet(fillet4_edges, radius=FILLET4_R)

    # CSK for M3 Flat Head Machine Screw1 (through all)
    with Locations(Plane(origin=(213.1, 5.194859832, -66.603098655), x_dir=(0, -0.104528463268, -0.994521895368), z_dir=(0, -0.994521895368, 0.104528463268))):
        with Locations((0, 0)):
            CounterSinkHole(CSK_FOR_M3_FLAT_HEAD_MACHINE_SCREW1_D / 2, CSK_FOR_M3_FLAT_HEAD_MACHINE_SCREW1_CSINK_D / 2, counter_sink_angle=CSK_FOR_M3_FLAT_HEAD_MACHINE_SCREW1_CSINK_ANGLE)

    # CSK for M3 Flat Head Machine Screw1 on f (through all)
    with Locations(Plane(origin=(178.1, 5.194859832, -66.603098655), x_dir=(0, -0.104527994185, -0.994521944671), z_dir=(0, -0.994521944671, 0.104527994185))):
        with Locations((0, 0)):
            CounterSinkHole(CSK_FOR_M3_FLAT_HEAD_MACHINE_SCREW1_ON_F_D / 2, CSK_FOR_M3_FLAT_HEAD_MACHINE_SCREW1_ON_F_CSINK_D / 2, counter_sink_angle=CSK_FOR_M3_FLAT_HEAD_MACHINE_SCREW1_ON_F_CSINK_ANGLE)


solid = part.part
